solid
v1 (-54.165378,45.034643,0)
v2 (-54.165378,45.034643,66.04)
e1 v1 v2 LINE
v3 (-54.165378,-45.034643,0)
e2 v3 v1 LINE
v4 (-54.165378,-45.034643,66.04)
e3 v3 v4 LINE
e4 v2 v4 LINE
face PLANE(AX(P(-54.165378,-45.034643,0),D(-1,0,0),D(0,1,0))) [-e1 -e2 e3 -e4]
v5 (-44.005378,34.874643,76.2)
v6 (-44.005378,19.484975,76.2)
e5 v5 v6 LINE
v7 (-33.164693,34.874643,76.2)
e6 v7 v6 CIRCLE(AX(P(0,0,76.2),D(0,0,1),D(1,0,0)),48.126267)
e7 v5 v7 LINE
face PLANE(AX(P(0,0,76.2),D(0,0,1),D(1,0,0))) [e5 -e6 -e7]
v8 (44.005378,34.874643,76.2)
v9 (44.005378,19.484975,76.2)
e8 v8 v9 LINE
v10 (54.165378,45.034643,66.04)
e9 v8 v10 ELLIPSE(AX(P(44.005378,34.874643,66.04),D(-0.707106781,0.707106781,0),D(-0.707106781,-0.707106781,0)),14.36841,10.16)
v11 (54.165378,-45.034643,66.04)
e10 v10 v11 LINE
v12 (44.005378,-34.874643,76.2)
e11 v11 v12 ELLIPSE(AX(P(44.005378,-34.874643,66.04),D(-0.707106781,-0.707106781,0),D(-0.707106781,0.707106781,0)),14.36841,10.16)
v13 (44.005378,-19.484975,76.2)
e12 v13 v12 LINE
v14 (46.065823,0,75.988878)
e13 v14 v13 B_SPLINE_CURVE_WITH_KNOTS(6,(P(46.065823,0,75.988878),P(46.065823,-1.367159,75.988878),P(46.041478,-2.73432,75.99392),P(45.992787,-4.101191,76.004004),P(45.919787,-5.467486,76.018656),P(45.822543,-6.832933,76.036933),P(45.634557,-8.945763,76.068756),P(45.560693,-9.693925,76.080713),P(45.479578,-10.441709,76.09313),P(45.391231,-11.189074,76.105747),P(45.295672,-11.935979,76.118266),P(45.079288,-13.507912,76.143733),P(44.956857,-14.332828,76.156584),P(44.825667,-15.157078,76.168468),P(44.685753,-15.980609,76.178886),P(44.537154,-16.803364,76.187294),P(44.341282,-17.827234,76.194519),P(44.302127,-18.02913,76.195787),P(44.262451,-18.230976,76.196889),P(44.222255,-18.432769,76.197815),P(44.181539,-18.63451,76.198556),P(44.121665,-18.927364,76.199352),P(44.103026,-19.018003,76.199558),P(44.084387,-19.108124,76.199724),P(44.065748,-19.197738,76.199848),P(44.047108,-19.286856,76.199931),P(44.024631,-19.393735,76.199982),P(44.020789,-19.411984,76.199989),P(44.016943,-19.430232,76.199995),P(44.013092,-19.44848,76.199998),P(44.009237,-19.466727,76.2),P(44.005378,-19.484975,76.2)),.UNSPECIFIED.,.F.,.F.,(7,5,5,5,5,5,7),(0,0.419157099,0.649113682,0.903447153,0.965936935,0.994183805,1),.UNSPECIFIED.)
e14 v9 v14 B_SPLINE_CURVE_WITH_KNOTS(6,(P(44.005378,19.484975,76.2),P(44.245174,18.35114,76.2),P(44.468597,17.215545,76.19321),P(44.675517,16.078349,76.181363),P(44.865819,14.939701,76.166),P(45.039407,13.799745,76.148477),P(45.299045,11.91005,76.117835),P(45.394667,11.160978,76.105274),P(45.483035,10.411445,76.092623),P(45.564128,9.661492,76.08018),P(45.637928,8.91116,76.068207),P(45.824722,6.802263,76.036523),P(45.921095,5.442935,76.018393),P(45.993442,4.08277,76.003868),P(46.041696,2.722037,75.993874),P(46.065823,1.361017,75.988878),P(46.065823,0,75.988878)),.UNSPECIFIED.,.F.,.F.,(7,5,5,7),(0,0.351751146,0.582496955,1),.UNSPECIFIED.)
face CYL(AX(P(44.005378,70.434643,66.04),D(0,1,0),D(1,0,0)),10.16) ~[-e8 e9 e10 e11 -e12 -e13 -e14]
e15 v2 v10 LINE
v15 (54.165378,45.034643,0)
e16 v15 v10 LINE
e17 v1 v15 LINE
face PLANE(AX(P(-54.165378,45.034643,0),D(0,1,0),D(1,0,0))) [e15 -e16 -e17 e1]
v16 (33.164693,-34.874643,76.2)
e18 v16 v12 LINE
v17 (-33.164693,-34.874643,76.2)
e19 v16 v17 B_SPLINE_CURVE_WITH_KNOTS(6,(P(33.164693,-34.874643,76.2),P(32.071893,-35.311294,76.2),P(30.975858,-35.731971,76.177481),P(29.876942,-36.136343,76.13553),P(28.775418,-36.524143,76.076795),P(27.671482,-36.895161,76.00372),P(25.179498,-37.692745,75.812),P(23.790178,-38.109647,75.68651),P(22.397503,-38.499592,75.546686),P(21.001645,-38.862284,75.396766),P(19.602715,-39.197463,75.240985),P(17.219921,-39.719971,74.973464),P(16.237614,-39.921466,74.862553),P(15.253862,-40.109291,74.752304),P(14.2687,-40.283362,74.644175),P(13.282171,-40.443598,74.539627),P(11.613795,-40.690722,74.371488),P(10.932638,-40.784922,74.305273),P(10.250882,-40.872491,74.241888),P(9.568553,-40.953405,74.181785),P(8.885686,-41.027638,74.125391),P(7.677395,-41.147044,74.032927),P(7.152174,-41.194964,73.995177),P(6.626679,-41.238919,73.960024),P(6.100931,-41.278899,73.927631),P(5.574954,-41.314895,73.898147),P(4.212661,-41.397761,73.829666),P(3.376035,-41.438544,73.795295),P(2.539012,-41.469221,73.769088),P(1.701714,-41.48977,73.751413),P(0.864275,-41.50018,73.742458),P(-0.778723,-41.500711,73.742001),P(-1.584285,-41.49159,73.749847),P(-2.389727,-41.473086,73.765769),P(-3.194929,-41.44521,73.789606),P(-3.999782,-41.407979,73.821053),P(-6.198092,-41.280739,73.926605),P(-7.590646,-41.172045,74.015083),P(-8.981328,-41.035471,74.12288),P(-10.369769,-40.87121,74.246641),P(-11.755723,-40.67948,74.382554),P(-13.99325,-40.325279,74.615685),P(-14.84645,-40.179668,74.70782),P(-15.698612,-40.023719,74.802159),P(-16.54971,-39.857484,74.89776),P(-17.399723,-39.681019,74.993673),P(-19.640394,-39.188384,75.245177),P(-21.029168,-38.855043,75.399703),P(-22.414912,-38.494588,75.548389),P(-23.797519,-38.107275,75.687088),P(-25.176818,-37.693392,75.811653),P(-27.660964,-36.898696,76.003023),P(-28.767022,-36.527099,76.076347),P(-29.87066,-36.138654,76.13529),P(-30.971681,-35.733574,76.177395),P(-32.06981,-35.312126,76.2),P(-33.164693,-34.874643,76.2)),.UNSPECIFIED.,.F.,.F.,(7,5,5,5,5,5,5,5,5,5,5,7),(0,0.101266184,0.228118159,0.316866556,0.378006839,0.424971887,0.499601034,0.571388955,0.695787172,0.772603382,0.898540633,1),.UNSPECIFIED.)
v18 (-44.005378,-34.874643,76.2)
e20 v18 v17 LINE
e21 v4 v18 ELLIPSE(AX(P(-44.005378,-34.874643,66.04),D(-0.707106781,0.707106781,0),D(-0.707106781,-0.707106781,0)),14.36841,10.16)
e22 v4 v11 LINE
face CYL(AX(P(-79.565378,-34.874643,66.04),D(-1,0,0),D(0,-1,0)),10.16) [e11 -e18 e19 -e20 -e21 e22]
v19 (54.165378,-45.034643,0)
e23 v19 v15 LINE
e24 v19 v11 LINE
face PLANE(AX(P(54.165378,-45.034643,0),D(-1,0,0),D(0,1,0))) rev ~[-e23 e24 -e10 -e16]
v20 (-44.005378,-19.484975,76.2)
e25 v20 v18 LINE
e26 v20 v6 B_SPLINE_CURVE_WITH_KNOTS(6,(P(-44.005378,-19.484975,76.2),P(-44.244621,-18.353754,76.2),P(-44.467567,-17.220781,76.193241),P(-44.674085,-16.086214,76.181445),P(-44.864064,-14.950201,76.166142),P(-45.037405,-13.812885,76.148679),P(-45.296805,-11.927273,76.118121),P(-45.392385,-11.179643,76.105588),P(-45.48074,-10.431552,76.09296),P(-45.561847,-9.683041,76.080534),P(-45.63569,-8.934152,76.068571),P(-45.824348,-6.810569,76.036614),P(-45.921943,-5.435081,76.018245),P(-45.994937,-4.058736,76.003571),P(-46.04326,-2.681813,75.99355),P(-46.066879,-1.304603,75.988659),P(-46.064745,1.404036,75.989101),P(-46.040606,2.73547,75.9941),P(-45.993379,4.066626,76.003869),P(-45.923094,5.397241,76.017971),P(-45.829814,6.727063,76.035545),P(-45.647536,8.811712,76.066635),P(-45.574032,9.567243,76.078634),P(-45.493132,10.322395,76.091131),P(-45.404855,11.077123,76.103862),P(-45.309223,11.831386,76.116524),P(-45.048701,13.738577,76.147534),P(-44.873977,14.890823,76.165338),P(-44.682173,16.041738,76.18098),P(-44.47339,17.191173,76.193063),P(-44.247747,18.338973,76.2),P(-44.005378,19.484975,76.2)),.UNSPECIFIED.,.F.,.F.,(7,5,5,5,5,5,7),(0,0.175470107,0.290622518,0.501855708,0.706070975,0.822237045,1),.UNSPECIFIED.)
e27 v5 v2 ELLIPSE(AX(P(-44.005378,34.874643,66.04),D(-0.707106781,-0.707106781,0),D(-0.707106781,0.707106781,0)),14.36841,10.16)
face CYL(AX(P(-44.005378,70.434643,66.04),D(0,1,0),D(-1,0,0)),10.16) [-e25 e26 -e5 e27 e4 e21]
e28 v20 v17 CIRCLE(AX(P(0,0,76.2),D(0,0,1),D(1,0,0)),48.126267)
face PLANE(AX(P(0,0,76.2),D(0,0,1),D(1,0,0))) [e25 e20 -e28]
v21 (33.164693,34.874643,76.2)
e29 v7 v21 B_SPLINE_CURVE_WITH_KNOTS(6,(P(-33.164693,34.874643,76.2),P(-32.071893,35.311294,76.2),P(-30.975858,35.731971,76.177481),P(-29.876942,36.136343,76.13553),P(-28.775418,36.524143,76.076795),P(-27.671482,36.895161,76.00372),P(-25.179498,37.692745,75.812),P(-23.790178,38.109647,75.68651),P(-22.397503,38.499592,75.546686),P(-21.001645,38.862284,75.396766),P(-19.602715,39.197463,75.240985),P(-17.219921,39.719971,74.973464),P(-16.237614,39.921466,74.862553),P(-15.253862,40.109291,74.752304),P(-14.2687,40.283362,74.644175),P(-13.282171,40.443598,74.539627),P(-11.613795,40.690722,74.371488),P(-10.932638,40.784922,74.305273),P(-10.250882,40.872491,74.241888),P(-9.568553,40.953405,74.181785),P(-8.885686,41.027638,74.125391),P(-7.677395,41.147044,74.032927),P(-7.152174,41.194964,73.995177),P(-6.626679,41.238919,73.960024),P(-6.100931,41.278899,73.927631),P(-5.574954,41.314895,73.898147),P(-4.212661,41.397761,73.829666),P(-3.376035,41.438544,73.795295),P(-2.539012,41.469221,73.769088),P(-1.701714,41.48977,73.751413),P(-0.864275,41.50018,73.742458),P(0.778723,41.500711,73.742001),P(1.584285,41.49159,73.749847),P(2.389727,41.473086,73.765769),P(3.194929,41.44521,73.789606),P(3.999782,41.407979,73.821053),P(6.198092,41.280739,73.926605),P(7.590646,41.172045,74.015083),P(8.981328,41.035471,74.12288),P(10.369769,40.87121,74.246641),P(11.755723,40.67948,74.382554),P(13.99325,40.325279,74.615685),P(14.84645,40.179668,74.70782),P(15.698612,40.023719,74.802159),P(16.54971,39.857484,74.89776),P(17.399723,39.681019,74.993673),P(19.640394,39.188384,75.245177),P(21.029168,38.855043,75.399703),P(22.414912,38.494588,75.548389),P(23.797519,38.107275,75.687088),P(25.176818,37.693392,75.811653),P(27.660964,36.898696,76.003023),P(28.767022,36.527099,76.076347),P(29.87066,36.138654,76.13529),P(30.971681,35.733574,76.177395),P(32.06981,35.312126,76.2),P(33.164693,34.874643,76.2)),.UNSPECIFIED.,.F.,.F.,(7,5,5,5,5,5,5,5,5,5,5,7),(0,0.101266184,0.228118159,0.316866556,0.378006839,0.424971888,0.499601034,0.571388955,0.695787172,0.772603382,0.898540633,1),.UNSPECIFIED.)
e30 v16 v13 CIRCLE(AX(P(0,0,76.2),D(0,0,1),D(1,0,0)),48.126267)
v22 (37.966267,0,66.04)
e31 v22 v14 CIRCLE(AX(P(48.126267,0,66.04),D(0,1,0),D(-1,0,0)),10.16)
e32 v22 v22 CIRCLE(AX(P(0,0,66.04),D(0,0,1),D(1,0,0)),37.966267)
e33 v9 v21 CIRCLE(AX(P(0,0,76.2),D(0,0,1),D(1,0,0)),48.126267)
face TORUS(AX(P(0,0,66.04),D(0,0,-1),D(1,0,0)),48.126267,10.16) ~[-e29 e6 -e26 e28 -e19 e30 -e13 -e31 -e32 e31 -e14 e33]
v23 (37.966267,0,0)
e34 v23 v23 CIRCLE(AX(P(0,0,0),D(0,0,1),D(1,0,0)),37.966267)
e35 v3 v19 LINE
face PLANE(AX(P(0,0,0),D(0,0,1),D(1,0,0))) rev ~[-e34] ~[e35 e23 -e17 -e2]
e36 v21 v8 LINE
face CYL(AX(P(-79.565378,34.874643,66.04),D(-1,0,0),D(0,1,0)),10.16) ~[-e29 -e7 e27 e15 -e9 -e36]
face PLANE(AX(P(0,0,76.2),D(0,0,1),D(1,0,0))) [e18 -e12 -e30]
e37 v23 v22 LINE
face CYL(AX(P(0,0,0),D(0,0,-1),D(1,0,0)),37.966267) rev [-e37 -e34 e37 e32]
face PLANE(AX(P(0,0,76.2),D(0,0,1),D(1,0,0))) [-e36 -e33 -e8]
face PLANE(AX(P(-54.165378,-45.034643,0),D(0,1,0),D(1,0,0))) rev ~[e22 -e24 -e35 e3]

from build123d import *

# Parameters (mm, degrees)
F0_W        = 108.3307564259
F0_H        = 90.0692865252
F0_R        = 37.9662670308
F1_DEPTH    = 76.2
F2_T1_DEPTH = 159.1307564259
F2_T3_DEPTH = 140.8692865252


# Not quite as in the source:
# - a fillet or chamfer that OpenCascade refuses, or shapes differently, is made with other operations: its cross-section is extruded or revolved along the edge and cut away or added


with BuildPart() as f1:
    # F0 (on Top) → F1 (new body)
    with BuildSketch(Plane.XY):
        Rectangle(F0_W, F0_H)
        Circle(F0_R, mode=Mode.SUBTRACT)
    extrude(amount=F1_DEPTH)

    # F2: fillet of radius 10.16 on 5 edges, made by hand

    # F2_s2 → F2_t1 (cut)
    with BuildSketch(Plane.YZ.offset(-79.5653782129)):
        with BuildLine():
            ThreePointArc((-45.0346432626, 66.04), (-42.0588481595, 73.2242048969), (-34.8746432626, 76.2))
            Line((-34.8746432626, 76.2), (-45.0346432626, 76.2))
            Line((-45.0346432626, 76.2), (-45.0346432626, 66.04))
        make_face()
        with BuildLine():
            ThreePointArc((45.0346432626, 66.04), (42.0588481595, 73.2242048969), (34.8746432626, 76.2))
            Line((34.8746432626, 76.2), (45.0346432626, 76.2))
            Line((45.0346432626, 76.2), (45.0346432626, 66.04))
        make_face()
    extrude(amount=F2_T1_DEPTH, mode=Mode.SUBTRACT)

    # F2_s4 → F2_t3 (cut)
    with BuildSketch(Plane.XZ.offset(-70.4346432626)):
        with BuildLine():
            ThreePointArc((-54.1653782129, 66.04), (-51.1895831098, 73.2242048969), (-44.0053782129, 76.2))
            Line((-44.0053782129, 76.2), (-54.1653782129, 76.2))
            Line((-54.1653782129, 76.2), (-54.1653782129, 66.04))
        make_face()
        with BuildLine():
            ThreePointArc((54.1653782129, 66.04), (51.1895831098, 73.2242048969), (44.0053782129, 76.2))
            Line((44.0053782129, 76.2), (54.1653782129, 76.2))
            Line((54.1653782129, 76.2), (54.1653782129, 66.04))
        make_face()
    extrude(amount=F2_T3_DEPTH, mode=Mode.SUBTRACT)

    # F2_s5 → F2_t6 (revolve, cut)
    with BuildSketch(Plane.XZ):
        with BuildLine():
            ThreePointArc((37.9662670308, 66.04), (40.9420621339, 73.2242048969), (48.1262670308, 76.2))
            Line((48.1262670308, 76.2), (37.9662670308, 76.2))
            Line((37.9662670308, 76.2), (37.9662670308, 66.04))
        make_face()
    revolve(axis=Axis((0, 0, 76.2), (0, 0, 1)), mode=Mode.SUBTRACT)


solid = f1.part
